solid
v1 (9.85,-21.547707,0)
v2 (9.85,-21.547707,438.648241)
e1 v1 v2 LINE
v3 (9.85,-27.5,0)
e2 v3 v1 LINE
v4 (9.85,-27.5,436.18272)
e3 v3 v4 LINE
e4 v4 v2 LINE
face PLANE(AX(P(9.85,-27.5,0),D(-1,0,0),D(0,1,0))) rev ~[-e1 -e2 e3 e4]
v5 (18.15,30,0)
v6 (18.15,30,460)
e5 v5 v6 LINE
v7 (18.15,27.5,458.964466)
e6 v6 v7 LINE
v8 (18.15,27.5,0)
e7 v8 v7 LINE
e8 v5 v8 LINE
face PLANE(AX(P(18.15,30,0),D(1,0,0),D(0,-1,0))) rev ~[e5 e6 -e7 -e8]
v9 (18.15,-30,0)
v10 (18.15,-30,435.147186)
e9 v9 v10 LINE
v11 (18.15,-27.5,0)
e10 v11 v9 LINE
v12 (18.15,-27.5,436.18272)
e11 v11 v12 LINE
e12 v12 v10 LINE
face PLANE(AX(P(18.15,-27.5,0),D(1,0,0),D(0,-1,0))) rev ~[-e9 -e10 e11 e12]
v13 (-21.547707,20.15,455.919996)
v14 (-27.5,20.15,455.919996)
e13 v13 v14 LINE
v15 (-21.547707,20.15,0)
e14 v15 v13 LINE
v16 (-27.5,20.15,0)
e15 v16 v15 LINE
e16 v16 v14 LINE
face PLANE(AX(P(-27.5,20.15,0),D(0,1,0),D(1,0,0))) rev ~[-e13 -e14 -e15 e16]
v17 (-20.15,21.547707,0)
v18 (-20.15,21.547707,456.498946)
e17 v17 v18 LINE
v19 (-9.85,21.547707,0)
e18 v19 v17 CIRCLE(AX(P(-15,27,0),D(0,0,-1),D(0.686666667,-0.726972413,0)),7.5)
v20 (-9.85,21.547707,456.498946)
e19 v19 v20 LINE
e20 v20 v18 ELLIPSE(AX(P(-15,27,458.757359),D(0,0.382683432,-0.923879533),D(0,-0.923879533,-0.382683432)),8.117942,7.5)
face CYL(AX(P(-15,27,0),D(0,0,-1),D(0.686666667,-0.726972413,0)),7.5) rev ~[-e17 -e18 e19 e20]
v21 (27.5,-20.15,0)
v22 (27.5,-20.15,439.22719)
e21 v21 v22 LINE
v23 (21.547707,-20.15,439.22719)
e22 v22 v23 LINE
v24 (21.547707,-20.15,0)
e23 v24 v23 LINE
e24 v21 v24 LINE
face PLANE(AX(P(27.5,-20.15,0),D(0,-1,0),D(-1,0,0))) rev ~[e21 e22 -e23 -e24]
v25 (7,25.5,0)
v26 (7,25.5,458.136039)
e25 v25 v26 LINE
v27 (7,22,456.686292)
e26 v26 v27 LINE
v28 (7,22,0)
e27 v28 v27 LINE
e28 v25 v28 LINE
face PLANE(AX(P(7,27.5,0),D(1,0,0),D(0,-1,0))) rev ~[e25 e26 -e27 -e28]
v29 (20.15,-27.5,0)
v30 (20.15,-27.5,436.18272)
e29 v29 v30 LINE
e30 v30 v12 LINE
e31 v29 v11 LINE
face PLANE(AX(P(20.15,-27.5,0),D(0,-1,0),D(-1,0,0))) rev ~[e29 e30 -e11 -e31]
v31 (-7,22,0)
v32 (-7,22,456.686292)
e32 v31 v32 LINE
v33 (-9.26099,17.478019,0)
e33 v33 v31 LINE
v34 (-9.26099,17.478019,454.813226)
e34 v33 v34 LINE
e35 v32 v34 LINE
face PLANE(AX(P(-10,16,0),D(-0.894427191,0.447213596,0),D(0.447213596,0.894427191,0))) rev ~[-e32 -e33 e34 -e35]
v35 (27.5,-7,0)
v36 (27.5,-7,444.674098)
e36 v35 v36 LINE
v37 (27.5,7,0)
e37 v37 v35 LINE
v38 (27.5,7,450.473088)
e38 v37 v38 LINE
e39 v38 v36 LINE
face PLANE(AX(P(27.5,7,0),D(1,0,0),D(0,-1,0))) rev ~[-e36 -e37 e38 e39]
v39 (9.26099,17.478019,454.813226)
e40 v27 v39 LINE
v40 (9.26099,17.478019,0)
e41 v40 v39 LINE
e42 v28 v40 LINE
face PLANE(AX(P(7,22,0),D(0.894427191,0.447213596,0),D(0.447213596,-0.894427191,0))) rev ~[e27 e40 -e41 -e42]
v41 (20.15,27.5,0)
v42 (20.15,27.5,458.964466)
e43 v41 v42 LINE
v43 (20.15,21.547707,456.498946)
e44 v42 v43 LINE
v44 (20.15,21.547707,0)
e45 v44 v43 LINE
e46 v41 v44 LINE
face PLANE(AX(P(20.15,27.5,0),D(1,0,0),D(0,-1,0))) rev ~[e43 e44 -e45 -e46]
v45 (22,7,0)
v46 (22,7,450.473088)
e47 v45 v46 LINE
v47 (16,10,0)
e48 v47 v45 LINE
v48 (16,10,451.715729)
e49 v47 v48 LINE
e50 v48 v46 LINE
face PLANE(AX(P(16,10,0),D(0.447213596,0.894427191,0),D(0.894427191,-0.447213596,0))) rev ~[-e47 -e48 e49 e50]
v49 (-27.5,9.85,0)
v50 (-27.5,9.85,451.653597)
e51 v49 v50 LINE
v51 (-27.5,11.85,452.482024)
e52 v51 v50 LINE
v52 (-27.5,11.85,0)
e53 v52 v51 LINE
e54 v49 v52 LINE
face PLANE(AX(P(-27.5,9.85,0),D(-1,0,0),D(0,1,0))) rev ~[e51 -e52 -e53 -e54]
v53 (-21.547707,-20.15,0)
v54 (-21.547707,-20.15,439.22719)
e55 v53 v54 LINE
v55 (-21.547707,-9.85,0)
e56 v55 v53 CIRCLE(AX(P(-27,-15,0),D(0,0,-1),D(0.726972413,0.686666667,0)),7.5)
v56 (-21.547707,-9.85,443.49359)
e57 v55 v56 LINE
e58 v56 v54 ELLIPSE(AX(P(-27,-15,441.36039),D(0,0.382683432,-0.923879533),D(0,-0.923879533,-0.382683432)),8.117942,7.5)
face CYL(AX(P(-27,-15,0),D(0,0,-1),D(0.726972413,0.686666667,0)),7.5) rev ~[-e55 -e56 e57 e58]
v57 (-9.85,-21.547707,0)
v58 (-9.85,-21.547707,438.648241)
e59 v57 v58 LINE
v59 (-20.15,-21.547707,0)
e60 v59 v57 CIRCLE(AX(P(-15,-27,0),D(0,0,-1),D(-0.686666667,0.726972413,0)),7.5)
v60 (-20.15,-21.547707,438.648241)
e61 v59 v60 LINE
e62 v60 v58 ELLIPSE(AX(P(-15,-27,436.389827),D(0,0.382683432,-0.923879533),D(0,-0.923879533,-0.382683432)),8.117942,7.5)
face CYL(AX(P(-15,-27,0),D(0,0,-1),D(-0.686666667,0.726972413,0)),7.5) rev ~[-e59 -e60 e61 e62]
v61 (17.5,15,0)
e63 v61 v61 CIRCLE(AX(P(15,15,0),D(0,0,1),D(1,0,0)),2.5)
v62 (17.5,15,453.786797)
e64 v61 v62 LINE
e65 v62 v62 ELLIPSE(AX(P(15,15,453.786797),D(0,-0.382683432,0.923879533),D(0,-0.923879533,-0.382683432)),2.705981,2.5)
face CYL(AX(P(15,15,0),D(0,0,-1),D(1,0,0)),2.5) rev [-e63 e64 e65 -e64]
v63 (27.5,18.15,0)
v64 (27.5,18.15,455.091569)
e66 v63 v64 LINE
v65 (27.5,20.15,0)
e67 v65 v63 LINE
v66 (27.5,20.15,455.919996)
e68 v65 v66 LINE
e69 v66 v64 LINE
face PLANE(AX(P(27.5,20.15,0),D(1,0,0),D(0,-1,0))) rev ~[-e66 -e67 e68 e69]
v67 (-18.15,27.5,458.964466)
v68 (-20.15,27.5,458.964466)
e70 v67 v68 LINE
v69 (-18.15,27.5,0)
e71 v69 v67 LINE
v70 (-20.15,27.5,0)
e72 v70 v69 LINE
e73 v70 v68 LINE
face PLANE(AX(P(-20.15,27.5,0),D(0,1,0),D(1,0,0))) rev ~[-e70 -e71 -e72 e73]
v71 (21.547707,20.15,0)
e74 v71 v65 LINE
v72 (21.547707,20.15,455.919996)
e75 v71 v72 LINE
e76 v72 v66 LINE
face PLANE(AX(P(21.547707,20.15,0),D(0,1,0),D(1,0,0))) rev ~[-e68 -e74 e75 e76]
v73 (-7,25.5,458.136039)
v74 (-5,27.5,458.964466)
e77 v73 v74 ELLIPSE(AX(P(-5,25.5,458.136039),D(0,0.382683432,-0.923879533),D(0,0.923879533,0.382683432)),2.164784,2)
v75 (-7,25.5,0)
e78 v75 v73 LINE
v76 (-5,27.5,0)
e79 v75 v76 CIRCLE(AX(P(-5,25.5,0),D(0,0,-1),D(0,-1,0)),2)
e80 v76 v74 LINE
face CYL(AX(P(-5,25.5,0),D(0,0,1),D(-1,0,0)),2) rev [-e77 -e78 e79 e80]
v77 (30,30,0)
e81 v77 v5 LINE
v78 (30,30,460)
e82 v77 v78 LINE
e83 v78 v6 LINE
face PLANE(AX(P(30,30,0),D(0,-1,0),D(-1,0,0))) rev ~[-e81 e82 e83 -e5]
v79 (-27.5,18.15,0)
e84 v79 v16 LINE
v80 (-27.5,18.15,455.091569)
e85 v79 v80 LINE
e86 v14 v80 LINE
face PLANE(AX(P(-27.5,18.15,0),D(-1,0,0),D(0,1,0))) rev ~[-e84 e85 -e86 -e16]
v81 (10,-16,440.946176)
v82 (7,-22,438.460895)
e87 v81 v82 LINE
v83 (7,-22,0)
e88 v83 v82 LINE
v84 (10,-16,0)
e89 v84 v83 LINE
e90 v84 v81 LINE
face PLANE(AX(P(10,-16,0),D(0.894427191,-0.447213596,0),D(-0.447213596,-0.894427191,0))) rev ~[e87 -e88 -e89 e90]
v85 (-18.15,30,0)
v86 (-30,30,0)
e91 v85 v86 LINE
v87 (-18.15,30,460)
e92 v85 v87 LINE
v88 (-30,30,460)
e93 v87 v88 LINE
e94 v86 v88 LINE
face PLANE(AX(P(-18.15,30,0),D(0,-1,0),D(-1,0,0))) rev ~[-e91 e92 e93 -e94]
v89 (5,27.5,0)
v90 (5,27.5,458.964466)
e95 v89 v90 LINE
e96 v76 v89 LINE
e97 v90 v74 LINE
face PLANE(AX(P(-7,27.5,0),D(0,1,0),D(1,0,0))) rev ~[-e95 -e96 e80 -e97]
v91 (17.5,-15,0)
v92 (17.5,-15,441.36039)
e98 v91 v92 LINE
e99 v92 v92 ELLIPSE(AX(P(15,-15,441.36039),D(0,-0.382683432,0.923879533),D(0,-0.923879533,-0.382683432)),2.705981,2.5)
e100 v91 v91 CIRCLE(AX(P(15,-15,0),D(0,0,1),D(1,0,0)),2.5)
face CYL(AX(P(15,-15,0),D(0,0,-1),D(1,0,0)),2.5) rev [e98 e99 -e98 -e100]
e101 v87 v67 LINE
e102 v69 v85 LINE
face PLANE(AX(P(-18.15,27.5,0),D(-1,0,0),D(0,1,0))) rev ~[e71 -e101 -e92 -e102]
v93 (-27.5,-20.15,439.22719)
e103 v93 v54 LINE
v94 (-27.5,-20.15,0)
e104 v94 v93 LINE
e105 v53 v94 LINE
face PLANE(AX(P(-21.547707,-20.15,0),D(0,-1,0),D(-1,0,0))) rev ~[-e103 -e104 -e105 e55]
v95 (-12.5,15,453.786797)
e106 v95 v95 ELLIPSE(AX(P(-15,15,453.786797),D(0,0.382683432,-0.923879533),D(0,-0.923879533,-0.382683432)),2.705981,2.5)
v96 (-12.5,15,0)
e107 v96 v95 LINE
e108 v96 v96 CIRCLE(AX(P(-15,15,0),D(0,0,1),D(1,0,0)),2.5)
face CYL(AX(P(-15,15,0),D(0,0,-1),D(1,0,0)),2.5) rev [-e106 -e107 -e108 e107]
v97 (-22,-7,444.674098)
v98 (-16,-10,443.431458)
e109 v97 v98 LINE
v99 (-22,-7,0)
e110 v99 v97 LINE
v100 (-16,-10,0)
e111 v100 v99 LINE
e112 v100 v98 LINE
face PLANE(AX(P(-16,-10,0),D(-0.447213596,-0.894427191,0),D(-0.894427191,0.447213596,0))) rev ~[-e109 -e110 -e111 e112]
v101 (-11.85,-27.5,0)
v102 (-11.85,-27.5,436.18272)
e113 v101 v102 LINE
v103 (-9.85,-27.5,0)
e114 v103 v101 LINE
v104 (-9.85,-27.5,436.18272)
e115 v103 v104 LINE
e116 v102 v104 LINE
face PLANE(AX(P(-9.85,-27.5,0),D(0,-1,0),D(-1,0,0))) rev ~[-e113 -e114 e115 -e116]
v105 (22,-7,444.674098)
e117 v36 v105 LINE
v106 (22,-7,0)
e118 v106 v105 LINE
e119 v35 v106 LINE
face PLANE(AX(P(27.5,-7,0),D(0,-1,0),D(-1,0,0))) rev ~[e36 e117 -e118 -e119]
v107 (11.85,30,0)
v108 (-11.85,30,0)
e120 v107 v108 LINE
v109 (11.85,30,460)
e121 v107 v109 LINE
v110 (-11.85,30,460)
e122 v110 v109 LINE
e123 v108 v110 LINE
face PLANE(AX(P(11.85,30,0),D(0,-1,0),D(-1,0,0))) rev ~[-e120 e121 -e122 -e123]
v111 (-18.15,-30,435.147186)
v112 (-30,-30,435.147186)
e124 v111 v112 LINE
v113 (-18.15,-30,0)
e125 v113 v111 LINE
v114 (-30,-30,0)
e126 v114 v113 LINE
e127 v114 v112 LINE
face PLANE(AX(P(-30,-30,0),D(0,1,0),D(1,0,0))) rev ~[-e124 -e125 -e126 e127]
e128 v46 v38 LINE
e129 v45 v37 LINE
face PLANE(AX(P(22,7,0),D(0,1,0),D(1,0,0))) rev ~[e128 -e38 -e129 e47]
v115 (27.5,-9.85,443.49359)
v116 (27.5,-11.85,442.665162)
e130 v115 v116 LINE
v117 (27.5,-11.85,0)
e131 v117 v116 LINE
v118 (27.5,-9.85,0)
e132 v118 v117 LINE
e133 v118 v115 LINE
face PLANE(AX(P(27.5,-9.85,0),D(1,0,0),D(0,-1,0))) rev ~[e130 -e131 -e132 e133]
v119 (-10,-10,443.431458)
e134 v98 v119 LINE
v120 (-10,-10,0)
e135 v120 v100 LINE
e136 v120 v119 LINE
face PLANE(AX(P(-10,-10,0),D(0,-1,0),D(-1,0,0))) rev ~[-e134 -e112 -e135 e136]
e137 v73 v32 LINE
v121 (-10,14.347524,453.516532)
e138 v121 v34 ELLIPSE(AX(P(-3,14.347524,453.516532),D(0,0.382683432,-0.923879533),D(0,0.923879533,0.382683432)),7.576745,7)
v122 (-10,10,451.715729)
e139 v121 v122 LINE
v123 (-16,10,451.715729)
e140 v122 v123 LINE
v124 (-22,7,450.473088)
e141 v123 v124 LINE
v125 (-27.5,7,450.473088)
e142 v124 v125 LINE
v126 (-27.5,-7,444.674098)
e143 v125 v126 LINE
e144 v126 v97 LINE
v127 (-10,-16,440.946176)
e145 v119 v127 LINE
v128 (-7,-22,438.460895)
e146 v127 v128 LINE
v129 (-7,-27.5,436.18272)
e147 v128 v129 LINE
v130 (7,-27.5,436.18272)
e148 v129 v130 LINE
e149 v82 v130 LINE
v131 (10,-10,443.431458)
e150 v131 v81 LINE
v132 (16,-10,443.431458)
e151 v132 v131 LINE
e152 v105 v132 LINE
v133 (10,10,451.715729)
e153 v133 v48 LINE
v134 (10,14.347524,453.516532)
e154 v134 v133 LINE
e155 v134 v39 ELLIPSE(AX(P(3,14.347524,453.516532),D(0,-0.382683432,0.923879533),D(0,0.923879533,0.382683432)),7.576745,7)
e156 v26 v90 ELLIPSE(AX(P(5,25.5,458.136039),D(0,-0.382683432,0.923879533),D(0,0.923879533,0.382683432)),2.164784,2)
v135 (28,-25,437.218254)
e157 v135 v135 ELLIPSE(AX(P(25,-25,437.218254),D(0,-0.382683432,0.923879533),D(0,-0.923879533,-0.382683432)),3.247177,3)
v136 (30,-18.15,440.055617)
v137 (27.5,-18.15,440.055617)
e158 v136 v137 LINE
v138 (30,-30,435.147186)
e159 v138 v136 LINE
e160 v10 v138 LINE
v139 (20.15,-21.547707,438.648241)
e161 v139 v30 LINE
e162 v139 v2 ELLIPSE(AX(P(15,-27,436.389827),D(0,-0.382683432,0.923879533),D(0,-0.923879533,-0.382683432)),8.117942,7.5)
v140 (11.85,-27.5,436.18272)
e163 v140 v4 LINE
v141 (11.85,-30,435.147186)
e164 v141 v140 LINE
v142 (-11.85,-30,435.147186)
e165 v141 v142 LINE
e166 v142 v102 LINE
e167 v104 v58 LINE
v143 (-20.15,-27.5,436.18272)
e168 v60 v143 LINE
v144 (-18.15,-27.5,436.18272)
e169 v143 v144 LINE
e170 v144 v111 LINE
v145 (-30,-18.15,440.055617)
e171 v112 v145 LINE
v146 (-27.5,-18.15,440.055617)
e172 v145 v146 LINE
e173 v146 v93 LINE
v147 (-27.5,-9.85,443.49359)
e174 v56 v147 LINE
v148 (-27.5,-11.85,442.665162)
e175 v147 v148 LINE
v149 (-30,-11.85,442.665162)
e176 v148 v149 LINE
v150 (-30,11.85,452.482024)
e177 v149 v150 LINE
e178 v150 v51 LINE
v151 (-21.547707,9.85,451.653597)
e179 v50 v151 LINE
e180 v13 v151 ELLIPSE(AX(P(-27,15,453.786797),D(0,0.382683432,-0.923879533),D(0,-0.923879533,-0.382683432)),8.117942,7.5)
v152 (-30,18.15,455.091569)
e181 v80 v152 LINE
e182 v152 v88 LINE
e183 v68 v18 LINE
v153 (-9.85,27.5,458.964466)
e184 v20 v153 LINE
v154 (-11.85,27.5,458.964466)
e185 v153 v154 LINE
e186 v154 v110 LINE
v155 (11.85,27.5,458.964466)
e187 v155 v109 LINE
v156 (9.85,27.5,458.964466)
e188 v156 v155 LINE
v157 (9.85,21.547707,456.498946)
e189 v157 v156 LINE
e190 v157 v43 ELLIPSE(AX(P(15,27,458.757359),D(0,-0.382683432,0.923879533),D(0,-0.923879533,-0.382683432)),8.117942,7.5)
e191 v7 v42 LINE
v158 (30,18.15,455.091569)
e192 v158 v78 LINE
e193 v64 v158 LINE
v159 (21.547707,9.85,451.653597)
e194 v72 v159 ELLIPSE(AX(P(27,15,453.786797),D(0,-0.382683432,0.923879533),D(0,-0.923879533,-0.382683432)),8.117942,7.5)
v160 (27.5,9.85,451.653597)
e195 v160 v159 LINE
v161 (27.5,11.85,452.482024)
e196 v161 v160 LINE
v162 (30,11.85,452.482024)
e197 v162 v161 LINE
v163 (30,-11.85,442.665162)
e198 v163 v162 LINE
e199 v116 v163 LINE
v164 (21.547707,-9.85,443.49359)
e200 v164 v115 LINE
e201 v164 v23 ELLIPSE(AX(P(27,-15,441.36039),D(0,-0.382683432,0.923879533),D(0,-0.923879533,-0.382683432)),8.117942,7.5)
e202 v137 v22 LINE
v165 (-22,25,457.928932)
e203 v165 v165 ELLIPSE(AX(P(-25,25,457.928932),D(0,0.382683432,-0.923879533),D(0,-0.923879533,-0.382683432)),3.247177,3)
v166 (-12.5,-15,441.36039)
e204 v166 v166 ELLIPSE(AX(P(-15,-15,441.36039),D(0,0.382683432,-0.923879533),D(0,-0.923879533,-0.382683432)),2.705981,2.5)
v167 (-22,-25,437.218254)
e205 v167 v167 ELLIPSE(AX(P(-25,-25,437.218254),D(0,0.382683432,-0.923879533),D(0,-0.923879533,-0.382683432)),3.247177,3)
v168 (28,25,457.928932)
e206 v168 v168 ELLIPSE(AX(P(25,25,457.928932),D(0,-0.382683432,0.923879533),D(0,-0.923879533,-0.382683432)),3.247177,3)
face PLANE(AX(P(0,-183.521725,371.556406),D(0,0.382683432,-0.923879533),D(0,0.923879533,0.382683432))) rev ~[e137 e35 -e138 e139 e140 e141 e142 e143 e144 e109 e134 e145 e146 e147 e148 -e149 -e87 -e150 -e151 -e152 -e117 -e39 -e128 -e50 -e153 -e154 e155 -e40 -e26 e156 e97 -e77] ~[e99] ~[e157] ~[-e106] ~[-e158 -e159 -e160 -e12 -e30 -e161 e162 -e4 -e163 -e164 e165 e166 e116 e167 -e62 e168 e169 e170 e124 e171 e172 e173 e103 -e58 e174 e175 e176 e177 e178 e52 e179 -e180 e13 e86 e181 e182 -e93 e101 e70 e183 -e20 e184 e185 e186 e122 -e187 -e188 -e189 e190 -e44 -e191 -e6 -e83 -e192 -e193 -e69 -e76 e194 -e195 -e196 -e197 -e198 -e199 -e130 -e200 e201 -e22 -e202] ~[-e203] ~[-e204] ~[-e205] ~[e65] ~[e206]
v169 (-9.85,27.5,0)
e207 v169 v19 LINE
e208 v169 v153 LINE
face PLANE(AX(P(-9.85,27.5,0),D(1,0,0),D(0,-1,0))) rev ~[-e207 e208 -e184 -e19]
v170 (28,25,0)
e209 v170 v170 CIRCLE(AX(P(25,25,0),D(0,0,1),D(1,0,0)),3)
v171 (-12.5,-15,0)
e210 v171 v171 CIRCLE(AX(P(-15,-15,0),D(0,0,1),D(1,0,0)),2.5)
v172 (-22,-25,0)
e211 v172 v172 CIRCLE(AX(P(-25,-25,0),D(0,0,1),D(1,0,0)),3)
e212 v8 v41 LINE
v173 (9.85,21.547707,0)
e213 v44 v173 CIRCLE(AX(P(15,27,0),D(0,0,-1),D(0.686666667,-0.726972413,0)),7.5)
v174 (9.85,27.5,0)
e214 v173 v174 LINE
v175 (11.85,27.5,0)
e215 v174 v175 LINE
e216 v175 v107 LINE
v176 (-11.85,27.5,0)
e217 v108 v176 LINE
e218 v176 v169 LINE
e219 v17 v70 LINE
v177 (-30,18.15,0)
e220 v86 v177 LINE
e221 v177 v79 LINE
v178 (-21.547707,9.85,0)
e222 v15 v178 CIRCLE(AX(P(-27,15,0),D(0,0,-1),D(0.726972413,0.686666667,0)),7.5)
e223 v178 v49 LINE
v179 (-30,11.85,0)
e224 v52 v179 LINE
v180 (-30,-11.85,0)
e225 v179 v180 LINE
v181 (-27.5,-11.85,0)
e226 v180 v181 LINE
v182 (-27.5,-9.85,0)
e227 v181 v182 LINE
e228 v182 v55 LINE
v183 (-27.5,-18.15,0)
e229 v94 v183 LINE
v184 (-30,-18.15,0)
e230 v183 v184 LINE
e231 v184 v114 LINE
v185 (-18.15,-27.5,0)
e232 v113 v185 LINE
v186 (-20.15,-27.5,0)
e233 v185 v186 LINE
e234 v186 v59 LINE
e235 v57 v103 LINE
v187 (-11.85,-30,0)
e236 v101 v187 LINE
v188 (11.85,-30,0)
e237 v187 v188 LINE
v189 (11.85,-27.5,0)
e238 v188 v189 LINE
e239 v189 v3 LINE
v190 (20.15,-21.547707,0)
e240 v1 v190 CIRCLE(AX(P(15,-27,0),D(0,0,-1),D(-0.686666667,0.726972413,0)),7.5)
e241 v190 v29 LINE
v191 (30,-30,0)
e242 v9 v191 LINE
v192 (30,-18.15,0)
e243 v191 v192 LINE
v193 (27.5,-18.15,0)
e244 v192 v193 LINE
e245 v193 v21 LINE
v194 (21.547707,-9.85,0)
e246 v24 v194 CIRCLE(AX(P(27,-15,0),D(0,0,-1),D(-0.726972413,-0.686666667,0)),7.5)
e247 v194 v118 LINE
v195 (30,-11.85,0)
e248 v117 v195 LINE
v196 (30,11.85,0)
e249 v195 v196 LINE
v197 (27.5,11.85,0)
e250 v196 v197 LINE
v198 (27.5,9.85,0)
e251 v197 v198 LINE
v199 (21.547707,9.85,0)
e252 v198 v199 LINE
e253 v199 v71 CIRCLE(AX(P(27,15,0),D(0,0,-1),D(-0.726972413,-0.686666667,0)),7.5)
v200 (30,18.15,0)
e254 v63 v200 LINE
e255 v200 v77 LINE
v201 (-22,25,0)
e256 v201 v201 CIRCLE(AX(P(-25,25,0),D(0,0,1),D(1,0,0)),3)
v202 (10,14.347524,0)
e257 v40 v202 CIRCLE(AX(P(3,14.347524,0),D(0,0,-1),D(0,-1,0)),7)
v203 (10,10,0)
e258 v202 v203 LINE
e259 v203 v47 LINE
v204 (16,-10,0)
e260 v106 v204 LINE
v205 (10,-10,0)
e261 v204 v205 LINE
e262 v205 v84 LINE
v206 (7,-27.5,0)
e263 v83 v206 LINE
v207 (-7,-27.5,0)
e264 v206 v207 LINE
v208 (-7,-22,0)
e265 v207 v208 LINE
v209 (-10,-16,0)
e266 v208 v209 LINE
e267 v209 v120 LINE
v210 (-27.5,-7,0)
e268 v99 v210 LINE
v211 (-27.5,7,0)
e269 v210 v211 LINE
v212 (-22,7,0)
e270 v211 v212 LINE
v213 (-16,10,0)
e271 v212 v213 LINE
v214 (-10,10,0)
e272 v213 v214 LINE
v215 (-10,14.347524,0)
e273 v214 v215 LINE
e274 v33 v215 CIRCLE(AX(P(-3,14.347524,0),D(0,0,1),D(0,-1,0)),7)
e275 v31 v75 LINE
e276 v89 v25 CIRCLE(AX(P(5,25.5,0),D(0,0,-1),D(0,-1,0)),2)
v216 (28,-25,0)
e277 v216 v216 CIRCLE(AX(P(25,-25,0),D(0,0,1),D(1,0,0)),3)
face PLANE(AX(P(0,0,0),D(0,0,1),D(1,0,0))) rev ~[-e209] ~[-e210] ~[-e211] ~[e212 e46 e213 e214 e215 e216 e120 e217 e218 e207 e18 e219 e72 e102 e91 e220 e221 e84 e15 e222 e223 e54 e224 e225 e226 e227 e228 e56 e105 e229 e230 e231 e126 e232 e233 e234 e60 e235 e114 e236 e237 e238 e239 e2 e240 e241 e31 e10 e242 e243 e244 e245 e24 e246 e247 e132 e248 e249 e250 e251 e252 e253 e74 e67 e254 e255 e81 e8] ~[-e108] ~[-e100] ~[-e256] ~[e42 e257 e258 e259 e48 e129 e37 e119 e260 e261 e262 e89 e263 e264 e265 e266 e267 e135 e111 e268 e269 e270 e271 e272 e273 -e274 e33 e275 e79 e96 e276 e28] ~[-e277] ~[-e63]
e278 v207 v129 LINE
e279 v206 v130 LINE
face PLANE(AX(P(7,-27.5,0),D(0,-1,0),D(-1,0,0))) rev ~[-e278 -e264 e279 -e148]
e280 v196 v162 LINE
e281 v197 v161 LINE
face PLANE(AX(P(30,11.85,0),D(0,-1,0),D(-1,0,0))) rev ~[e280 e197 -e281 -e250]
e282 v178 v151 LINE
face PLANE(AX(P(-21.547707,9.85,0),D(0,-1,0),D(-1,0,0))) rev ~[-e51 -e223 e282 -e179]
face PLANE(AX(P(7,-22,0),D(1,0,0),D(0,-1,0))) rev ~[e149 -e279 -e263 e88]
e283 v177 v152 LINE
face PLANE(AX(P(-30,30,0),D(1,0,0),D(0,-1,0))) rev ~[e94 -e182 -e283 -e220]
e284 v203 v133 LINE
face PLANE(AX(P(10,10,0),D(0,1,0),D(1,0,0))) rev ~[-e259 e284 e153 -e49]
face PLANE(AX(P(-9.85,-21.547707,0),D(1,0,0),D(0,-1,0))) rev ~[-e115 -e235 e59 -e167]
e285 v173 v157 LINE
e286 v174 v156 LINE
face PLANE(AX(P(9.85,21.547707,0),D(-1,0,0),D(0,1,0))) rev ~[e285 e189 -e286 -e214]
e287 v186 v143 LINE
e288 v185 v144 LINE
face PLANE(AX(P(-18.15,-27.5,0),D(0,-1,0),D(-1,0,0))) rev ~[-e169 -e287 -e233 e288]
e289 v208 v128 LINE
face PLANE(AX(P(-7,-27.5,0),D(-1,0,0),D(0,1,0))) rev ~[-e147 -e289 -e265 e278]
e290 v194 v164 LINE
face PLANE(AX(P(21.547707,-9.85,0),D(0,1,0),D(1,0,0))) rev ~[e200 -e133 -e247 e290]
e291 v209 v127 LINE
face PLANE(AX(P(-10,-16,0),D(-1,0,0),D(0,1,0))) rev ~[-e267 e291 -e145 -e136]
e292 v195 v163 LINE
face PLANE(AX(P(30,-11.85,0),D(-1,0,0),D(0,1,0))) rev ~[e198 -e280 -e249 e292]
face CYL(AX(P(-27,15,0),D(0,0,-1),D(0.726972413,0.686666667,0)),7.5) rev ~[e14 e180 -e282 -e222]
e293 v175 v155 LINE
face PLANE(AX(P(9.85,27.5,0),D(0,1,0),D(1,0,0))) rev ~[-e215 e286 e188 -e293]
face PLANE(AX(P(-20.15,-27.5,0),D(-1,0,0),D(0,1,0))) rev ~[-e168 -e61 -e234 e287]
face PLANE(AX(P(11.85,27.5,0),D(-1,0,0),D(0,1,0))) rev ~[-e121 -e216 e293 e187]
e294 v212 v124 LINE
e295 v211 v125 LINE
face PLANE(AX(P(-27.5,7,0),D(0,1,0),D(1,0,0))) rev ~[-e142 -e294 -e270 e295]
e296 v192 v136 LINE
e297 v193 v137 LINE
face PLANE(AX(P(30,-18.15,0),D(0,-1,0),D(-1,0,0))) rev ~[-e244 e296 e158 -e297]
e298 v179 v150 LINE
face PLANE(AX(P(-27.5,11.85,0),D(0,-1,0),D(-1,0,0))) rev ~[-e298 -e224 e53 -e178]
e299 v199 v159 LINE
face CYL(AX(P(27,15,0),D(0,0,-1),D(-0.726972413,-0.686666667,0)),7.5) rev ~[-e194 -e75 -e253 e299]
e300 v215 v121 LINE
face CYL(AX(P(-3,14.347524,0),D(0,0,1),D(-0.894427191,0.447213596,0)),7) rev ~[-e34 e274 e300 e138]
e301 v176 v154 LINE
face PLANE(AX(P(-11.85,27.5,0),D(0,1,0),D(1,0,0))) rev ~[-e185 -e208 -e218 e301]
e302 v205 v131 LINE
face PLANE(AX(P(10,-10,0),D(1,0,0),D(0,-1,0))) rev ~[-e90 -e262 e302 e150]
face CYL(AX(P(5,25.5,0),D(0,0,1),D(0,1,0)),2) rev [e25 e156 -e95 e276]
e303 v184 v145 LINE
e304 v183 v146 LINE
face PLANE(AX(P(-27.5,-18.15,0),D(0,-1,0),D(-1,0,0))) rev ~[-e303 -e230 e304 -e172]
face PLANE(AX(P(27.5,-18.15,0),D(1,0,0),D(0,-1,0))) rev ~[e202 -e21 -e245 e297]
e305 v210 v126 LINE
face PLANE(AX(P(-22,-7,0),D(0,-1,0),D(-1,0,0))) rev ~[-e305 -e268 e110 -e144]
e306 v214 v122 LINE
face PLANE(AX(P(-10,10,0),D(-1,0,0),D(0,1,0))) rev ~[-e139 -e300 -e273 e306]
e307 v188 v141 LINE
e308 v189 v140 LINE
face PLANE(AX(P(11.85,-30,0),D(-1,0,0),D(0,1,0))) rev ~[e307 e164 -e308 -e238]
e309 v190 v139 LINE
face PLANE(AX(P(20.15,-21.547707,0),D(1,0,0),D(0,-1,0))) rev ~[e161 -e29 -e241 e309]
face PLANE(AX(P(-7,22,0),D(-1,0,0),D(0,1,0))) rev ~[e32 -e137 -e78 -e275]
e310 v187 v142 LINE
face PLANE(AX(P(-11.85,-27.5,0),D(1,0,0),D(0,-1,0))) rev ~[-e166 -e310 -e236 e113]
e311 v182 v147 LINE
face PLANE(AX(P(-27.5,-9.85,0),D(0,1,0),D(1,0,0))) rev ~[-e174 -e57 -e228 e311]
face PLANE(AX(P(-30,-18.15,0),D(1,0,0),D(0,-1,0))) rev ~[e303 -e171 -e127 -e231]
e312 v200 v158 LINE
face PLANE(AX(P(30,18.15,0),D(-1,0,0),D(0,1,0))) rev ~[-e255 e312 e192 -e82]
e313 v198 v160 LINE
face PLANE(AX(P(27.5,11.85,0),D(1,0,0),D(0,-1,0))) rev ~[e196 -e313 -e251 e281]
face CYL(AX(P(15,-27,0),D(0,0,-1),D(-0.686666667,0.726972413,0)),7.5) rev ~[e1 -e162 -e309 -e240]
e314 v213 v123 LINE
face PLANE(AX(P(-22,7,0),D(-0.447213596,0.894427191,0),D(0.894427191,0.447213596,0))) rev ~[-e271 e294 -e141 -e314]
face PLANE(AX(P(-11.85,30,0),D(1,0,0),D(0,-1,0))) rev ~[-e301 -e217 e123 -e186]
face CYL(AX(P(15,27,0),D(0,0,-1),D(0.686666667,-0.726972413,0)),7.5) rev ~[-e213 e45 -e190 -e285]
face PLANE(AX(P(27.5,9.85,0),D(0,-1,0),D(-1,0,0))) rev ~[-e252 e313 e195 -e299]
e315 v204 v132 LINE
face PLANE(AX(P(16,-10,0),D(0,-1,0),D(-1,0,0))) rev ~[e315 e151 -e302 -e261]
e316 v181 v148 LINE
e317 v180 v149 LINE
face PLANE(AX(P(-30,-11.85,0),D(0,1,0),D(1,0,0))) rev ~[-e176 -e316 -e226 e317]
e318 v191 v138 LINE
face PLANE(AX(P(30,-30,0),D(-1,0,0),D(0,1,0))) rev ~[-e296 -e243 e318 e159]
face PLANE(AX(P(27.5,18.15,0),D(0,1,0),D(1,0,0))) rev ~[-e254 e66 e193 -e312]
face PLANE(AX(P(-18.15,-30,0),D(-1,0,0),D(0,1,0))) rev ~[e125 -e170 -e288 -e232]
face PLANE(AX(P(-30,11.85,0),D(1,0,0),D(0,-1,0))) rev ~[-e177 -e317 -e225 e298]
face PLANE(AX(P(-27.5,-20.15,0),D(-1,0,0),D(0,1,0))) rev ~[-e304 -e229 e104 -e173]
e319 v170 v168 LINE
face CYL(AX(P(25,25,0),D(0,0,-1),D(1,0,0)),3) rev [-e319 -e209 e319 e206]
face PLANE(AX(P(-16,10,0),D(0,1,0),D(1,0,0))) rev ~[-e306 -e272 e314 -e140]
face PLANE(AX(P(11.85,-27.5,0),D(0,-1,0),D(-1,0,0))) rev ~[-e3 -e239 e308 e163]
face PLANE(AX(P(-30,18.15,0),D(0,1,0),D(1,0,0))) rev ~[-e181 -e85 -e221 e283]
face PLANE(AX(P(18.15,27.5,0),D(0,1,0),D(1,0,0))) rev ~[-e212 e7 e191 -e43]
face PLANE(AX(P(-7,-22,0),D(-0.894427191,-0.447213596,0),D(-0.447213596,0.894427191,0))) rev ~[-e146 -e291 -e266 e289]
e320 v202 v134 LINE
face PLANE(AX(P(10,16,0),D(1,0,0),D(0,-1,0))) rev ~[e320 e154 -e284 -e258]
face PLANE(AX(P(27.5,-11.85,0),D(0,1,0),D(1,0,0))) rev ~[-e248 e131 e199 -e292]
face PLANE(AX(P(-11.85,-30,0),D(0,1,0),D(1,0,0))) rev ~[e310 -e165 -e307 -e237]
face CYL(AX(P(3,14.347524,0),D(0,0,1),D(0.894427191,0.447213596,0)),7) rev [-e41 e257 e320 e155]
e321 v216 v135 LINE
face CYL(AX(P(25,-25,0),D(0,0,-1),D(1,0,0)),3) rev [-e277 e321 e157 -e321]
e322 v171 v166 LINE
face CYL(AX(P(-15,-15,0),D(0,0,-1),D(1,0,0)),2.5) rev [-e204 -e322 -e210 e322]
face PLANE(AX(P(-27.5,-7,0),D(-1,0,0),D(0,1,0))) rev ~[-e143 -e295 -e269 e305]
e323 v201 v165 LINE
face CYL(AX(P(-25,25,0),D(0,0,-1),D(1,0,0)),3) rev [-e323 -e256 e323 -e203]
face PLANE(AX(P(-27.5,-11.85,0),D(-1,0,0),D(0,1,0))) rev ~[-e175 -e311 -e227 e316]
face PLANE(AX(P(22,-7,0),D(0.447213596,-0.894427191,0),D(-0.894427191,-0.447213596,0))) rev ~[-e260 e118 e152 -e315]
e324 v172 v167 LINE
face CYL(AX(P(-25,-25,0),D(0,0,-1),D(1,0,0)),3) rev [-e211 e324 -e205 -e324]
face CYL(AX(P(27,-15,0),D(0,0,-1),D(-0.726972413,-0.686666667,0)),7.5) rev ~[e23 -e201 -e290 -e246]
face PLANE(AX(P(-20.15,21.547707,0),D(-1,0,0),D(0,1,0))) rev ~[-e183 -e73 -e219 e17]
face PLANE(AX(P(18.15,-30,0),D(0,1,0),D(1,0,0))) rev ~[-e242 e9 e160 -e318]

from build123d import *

# Parameters (mm, degrees)
F0_R          = 3
F0_R_2        = 2.5
F1_DEPTH      = 460
F2_R          = 2
F3_R          = 7
F5_DEPTH      = 30
F5_DEPTH_BACK = 30


# Not quite as in the source:
# - a feature names something its author has since deleted; it is built from what else it names


with BuildPart() as f1:
    # F0 (on Top) → F1 (new body)
    with BuildSketch(Plane.XY):
        with BuildLine():
            Line((18.15, -30), (30, -30))
            Line((30, -30), (30, -18.15))
            Line((30, -18.15), (27.5, -18.15))
            Line((27.5, -18.15), (27.5, -20.15))
            Line((27.5, -20.15), (21.5477069044, -20.15))
            ThreePointArc((21.5477069044, -20.15), (19.5, -15), (21.5477069044, -9.85))
            Line((21.5477069044, -9.85), (27.5, -9.85))
            Line((27.5, -9.85), (27.5, -11.85))
            Line((27.5, -11.85), (30, -11.85))
            Line((30, -11.85), (30, 11.85))
            Line((30, 11.85), (27.5, 11.85))
            Line((27.5, 11.85), (27.5, 9.85))
            Line((27.5, 9.85), (21.5477069044, 9.85))
            ThreePointArc((21.5477069044, 9.85), (19.5, 15), (21.5477069044, 20.15))
            Line((21.5477069044, 20.15), (27.5, 20.15))
            Line((27.5, 20.15), (27.5, 18.15))
            Line((27.5, 18.15), (30, 18.15))
            Line((30, 18.15), (30, 30))
            Line((30, 30), (18.15, 30))
            Line((18.15, 30), (18.15, 27.5))
            Line((18.15, 27.5), (20.15, 27.5))
            Line((20.15, 27.5), (20.15, 21.5477069044))
            ThreePointArc((20.15, 21.5477069044), (15, 19.5), (9.85, 21.5477069044))
            Line((9.85, 21.5477069044), (9.85, 27.5))
            Line((9.85, 27.5), (11.85, 27.5))
            Line((11.85, 27.5), (11.85, 30))
            Line((11.85, 30), (-11.85, 30))
            Line((-11.85, 30), (-11.85, 27.5))
            Line((-11.85, 27.5), (-9.85, 27.5))
            Line((-9.85, 27.5), (-9.85, 21.5477069044))
            ThreePointArc((-9.85, 21.5477069044), (-15, 19.5), (-20.15, 21.5477069044))
            Line((-20.15, 21.5477069044), (-20.15, 27.5))
            Line((-20.15, 27.5), (-18.15, 27.5))
            Line((-18.15, 27.5), (-18.15, 30))
            Line((-18.15, 30), (-30, 30))
            Line((-30, 30), (-30, 18.15))
            Line((-30, 18.15), (-27.5, 18.15))
            Line((-27.5, 18.15), (-27.5, 20.15))
            Line((-27.5, 20.15), (-21.5477069044, 20.15))
            ThreePointArc((-21.5477069044, 20.15), (-19.5, 15), (-21.5477069044, 9.85))
            Line((-21.5477069044, 9.85), (-27.5, 9.85))
            Line((-27.5, 9.85), (-27.5, 11.85))
            Line((-27.5, 11.85), (-30, 11.85))
            Line((-30, 11.85), (-30, -11.85))
            Line((-30, -11.85), (-27.5, -11.85))
            Line((-27.5, -11.85), (-27.5, -9.85))
            Line((-27.5, -9.85), (-21.5477069044, -9.85))
            ThreePointArc((-21.5477069044, -9.85), (-19.5, -15), (-21.5477069044, -20.15))
            Line((-21.5477069044, -20.15), (-27.5, -20.15))
            Line((-27.5, -20.15), (-27.5, -18.15))
            Line((-27.5, -18.15), (-30, -18.15))
            Line((-30, -18.15), (-30, -30))
            Line((-30, -30), (-18.15, -30))
            Line((-18.15, -30), (-18.15, -27.5))
            Line((-18.15, -27.5), (-20.15, -27.5))
            Line((-20.15, -27.5), (-20.15, -21.5477069044))
            ThreePointArc((-20.15, -21.5477069044), (-15, -19.5), (-9.85, -21.5477069044))
            Line((-9.85, -21.5477069044), (-9.85, -27.5))
            Line((-9.85, -27.5), (-11.85, -27.5))
            Line((-11.85, -27.5), (-11.85, -30))
            Line((-11.85, -30), (11.85, -30))
            Line((11.85, -30), (11.85, -27.5))
            Line((11.85, -27.5), (9.85, -27.5))
            Line((9.85, -27.5), (9.85, -21.5477069044))
            ThreePointArc((9.85, -21.5477069044), (15, -19.5), (20.15, -21.5477069044))
            Line((20.15, -21.5477069044), (20.15, -27.5))
            Line((20.15, -27.5), (18.15, -27.5))
            Line((18.15, -27.5), (18.15, -30))
        make_face()
        with Locations((-25, -25)):
            Circle(F0_R, mode=Mode.SUBTRACT)
        with Locations((-15, -15)):
            Circle(F0_R_2, mode=Mode.SUBTRACT)
        with Locations((25, -25)):
            Circle(F0_R, mode=Mode.SUBTRACT)
        with Locations((15, -15)):
            Circle(F0_R_2, mode=Mode.SUBTRACT)
        with Locations((-25, 25)):
            Circle(F0_R, mode=Mode.SUBTRACT)
        with Locations((-15, 15)):
            Circle(F0_R_2, mode=Mode.SUBTRACT)
        Polygon((-7, 22), (-7, 27.5), (0, 27.5), (7, 27.5), (7, 22), (10, 16), (10, 10), (16, 10), (22, 7), (27.5, 7), (27.5, 0), (27.5, -7), (22, -7), (16, -10), (10, -10), (10, -16), (7, -22), (7, -27.5), (0, -27.5), (-7, -27.5), (-7, -22), (-10, -16), (-10, -10), (-16, -10), (-22, -7), (-27.5, -7), (-27.5, 0), (-27.5, 7), (-22, 7), (-16, 10), (-10, 10), (-10, 16), align=None, mode=Mode.SUBTRACT)
        with Locations((15, 15)):
            Circle(F0_R_2, mode=Mode.SUBTRACT)
        with Locations((25, 25)):
            Circle(F0_R, mode=Mode.SUBTRACT)
    extrude(amount=F1_DEPTH)

    # F2
    f2_edges = [f1.edges().sort_by_distance(p)[0] for p in [
        (-7, 27.5, 230),
        (7, 27.5, 230),
    ]]
    fillet(f2_edges, radius=F2_R)

    # F3
    f3_edges = [f1.edges().sort_by_distance(p)[0] for p in [
        (-10, 16, 230),
        (10, 16, 230),
    ]]
    fillet(f3_edges, radius=F3_R)

    # F4 (on Right) → F5 (cut, two sides)
    with BuildSketch(Plane.YZ) as f5_sk:
        Polygon((30, 460), (-101.7983138763, 778.1892768581), (-315.3200388241, 689.7456825234), (-183.5217249478, 371.5564056653), align=None)
    extrude(amount=F5_DEPTH, mode=Mode.SUBTRACT)
    extrude(f5_sk.sketch, amount=-F5_DEPTH_BACK, mode=Mode.SUBTRACT)


solid = f1.part
